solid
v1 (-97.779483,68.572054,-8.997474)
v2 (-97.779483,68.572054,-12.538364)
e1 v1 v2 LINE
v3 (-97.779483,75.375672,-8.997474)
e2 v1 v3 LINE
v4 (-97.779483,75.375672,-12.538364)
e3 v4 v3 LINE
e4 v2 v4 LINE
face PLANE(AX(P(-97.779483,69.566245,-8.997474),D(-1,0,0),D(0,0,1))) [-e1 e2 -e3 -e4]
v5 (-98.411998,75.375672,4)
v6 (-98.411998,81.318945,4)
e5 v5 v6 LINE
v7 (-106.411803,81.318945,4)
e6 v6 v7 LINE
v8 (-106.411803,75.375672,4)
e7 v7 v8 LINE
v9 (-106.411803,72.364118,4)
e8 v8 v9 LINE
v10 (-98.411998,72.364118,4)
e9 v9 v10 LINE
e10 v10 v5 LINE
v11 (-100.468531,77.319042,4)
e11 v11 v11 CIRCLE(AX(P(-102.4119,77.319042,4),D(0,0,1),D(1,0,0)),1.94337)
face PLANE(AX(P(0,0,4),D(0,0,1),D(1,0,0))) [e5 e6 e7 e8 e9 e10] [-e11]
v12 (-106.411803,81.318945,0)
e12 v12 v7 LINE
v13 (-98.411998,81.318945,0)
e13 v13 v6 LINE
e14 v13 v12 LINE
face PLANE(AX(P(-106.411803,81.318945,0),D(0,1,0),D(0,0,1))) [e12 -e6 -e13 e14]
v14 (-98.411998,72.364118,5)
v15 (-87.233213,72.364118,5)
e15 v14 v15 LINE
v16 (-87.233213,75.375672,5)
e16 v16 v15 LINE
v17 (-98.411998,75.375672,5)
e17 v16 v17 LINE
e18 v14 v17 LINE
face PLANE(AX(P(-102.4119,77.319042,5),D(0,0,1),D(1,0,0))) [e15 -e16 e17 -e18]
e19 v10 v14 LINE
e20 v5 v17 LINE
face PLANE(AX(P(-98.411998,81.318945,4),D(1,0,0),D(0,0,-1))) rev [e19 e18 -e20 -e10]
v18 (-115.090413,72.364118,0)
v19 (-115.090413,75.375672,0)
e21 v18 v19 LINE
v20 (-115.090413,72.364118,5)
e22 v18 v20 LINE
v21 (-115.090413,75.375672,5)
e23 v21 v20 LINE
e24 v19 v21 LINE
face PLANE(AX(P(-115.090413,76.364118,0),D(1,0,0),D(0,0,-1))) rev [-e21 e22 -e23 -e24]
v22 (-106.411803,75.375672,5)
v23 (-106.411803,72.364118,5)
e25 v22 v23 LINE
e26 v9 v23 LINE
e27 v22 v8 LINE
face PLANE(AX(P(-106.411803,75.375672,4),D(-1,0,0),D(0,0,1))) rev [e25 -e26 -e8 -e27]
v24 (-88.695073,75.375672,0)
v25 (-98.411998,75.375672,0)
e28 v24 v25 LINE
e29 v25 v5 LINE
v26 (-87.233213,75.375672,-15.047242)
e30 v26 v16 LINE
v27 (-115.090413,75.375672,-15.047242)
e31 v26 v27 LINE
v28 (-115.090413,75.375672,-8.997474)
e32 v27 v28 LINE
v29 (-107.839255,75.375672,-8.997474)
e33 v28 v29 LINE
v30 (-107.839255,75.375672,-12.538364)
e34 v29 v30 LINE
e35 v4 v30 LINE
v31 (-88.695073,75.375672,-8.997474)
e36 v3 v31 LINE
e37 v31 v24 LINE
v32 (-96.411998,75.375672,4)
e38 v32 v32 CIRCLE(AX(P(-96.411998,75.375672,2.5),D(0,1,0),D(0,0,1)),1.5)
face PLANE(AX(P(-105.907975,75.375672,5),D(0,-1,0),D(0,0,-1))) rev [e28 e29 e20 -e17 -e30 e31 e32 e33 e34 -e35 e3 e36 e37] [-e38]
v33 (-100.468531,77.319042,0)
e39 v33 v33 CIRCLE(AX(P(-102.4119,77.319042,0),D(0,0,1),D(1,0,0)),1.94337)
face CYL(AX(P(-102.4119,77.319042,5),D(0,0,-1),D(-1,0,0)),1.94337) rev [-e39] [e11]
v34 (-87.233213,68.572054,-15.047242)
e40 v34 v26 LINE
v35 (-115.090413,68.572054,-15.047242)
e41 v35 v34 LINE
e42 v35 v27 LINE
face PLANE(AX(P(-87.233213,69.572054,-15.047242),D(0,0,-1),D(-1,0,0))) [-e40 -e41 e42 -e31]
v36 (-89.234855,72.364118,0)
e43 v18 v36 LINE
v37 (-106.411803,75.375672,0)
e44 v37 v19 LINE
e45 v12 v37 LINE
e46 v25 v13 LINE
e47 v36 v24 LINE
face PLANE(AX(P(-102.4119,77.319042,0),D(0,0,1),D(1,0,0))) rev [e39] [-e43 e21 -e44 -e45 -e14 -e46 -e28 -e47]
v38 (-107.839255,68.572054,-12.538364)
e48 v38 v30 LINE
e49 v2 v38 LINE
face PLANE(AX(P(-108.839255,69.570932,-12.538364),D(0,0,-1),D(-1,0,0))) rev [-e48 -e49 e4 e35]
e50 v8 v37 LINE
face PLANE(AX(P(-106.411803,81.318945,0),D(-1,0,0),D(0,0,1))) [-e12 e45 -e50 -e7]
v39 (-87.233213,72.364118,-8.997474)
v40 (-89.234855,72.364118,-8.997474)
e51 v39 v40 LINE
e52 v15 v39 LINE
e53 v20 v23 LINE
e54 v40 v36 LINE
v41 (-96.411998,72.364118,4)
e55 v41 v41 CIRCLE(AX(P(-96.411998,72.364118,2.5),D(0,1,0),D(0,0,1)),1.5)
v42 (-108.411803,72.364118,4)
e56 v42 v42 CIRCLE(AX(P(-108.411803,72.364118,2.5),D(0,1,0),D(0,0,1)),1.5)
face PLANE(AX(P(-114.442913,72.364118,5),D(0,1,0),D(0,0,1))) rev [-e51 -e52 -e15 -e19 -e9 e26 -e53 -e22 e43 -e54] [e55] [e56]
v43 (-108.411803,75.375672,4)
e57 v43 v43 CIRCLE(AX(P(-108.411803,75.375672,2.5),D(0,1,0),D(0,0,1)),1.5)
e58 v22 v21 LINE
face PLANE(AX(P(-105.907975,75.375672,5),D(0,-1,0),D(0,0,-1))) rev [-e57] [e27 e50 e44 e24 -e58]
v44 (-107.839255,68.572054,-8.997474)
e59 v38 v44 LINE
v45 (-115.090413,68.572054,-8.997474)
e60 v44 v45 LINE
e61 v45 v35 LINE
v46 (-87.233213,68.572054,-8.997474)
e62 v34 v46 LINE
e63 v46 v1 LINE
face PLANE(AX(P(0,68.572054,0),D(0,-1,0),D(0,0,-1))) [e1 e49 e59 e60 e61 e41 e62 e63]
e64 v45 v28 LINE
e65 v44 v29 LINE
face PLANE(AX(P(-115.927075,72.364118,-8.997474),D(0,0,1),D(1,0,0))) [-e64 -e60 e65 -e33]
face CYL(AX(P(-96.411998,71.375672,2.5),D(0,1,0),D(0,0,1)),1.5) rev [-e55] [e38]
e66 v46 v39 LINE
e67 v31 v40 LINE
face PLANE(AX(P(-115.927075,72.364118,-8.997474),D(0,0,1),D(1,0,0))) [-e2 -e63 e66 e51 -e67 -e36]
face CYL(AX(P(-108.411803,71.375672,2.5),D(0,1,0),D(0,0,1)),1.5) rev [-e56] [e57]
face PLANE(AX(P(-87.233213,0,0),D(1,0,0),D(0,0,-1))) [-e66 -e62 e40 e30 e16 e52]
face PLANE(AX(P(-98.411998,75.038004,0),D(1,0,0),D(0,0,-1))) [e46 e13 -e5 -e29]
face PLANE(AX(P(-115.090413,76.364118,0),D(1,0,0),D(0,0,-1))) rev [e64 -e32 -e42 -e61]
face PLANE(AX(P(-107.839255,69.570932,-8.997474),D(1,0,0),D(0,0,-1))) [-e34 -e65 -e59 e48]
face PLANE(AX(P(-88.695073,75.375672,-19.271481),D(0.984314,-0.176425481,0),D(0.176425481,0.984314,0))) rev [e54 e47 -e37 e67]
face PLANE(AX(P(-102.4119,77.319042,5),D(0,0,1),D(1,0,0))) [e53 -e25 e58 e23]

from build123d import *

# Parameters (mm, degrees)
SKETCH1_R                 = 1.943369714
BOSS_EXTRUDE1_DEPTH       = 5
SKETCH2_W                 = 5
SKETCH2_H                 = 3.011554738
BOSS_EXTRUDE2_DEPTH       = 3
SKETCH3_W                 = 5
SKETCH3_H                 = 3.011554738
BOSS_EXTRUDE3_DEPTH       = 1
BOSS_EXTRUDE4_DEPTH       = 15.45
BOSS_EXTRUDE5_DEPTH       = 5
BOSS_EXTRUDE6_REACH       = 91.127
SKETCH6_W                 = 4.39741832
SKETCH6_H                 = 3.011554738
SKETCH7_W                 = 27.232002546
SKETCH7_H                 = 1.691876565
BOSS_EXTRUDE7_DEPTH       = 3.011555
CUT_EXTRUDE1_DEPTH        = 1.691877
SKETCH10_R                = 1.5
CUT_EXTRUDE2_DEPTH        = 5
CUT_EXTRUDE3_DEPTH        = 5
SKETCH12_W                = 7.087819815
SKETCH12_H                = 5.363231601
SKETCH12_W_2              = 7.084410937
BOSS_EXTRUDE8_DEPTH       = 3.011555
SKETCH13_R                = 1.5
CUT_EXTRUDE4_DEPTH        = 5
BOSS_EXTRUDE9_START       = -5.000001
BOSS_EXTRUDE9_DEPTH       = 5.000002
SKETCH15_R                = 1.5
BOSS_EXTRUDE10_DEPTH      = 3.011554738
CUT_EXTRUDE6_DEPTH        = 3.011555
BOSS_EXTRUDE11_START      = 1
BOSS_EXTRUDE11_DEPTH      = 1
CUT_EXTRUDE7_DEPTH        = 4
SKETCH21_R                = 1.5
CUT_EXTRUDE8_DEPTH        = 4
CUT_EXTRUDE9_DEPTH        = 1
BOSS_EXTRUDE12_START      = -13.37096588
BOSS_EXTRUDE12_DEPTH      = 4.373492366
BOSS_EXTRUDE13_DEPTH      = 1.68162
SKETCH30_W                = 13.059771794
SKETCH30_H                = 2.186746183
CUT_EXTRUDE10_DEPTH       = 10
SKETCH31_W                = 13.059771794
SKETCH31_H                = 2.186746183
BOSS_EXTRUDE14_DEPTH      = 2.793186
SKETCH32_W                = 27.857200393
SKETCH32_H                = 1.676275872
BOSS_EXTRUDE15_DEPTH      = 5.803619
SKETCH33_W                = 13.059771794
SKETCH33_H                = 1.354144498
CUT_EXTRUDE11_DEPTH       = 5.804742
BOSS_EXTRUDE16_DEPTH      = 0.832602
SKETCH35_W                = 2
SKETCH35_H                = 3.540890681
BOSS_EXTRUDE17_DEPTH      = 5.809427
SKETCH36_W                = 1
SKETCH36_H                = 3.540890681
BOSS_EXTRUDE18_DEPTH      = 5.80474
BOSS_EXTRUDE20_DEPTH      = 2
BOSS_EXTRUDE20_DEPTH_BACK = 2
CUT_EXTRUDE12_DEPTH       = 1


# Read off the part's stored shape, not the designer's step: Boss-Extrude12
with BuildPart() as part:
    # Sketch1 → Boss-Extrude1 (new body)
    with BuildSketch(Plane.XY):
        with BuildLine():
            Line((-105.90797469, 75.375672325), (-114.442913217, 75.375672325))
            Line((-114.442913217, 75.375672325), (-114.442913217, 72.364117587))
            Line((-114.442913217, 72.364117587), (-88.233212536, 72.364117587))
            Line((-88.233212536, 72.364117587), (-88.233212536, 75.375672325))
            Line((-88.233212536, 75.375672325), (-98.915825857, 75.375672325))
            ThreePointArc((-98.915825857, 75.375672325), (-102.411900273, 81.318944809), (-105.90797469, 75.375672325))
        make_face()
        with Locations((-102.411900273, 77.319042039)):
            Circle(SKETCH1_R, mode=Mode.SUBTRACT)
    extrude(amount=BOSS_EXTRUDE1_DEPTH)

    # Sketch2 → Boss-Extrude2 (add)
    with BuildSketch(Plane.ZY.offset(114.442913217)):
        with Locations((2.5, 73.869894956)):
            Rectangle(SKETCH2_W, SKETCH2_H)
    extrude(amount=BOSS_EXTRUDE2_DEPTH)

    # Sketch3 → Boss-Extrude3 (add)
    with BuildSketch(Plane(origin=(-88.233212536, 0, 0), x_dir=(0, 0, -1), z_dir=(1, 0, 0))):
        with Locations((-2.5, 73.869894956)):
            Rectangle(SKETCH3_W, SKETCH3_H)
    extrude(amount=BOSS_EXTRUDE3_DEPTH)

    # Sketch4 → Boss-Extrude4 (add)
    with BuildSketch(Plane(origin=(0, 0, 0), x_dir=(-1, 0, 0), z_dir=(0, 0, -1))):
        Polygon((89.234854516, 72.364117587), (87.233212536, 72.364117587), (87.233212536, 75.375672325), (88.695072503, 75.375672325), align=None)
        Polygon((117.442913217, 75.375672325), (117.442913217, 72.364117587), (115.090412929, 72.364117587), (115.927075049, 75.375672325), align=None)
    extrude(amount=BOSS_EXTRUDE4_DEPTH)

    # Sketch5 → Boss-Extrude5 (add)
    with BuildSketch(Plane(origin=(0, 0, -15.45), x_dir=(-1, 0, 0), z_dir=(0, 0, -1))):
        Polygon((89.234854516, 72.364117587), (88.695072503, 75.375672325), (87.233212536, 75.375672325), (87.233212536, 72.364117587), align=None)
        Polygon((117.442913217, 72.364117587), (117.442913217, 75.375672325), (115.927075049, 75.375672325), (115.090412929, 72.364117587), align=None)
    extrude(amount=BOSS_EXTRUDE5_DEPTH)

    # Boss-Extrude6: up to this plane
    boss_extrude6_end = Plane(origin=(-115.927075049, 75.375672325, -19.271481329), z_dir=(-0.9635080795452587, -0.2676792495712127, 0))
    # Sketch6 → Boss-Extrude6 (add, up to the surface)
    with BuildSketch(Plane(origin=(-87.233212536, 0, 0), x_dir=(0, 0, -1), z_dir=(1, 0, 0)), mode=Mode.PRIVATE) as boss_extrude6_sk1:
        with Locations((18.25129084, 73.869894956)):
            Rectangle(SKETCH6_W, SKETCH6_H)
    boss_extrude6_tool1 = split(extrude(boss_extrude6_sk1.sketch, amount=-BOSS_EXTRUDE6_REACH, mode=Mode.PRIVATE), bisect_by=boss_extrude6_end, keep=Keep.BOTH, mode=Mode.PRIVATE)
    add(boss_extrude6_tool1.solids().sort_by_distance((-87.233213, 73.869895, -18.251291))[0])

    # Sketch7 → Boss-Extrude7 (add)
    with BuildSketch(Plane(origin=(0, 75.375672325, 0), x_dir=(1, 0, 0), z_dir=(0, 1, 0))):
        with Locations((-102.311073776, 9.843411796)):
            Rectangle(SKETCH7_W, SKETCH7_H)
    extrude(amount=-BOSS_EXTRUDE7_DEPTH)

    # Sketch9 → Cut-Extrude1 (cut)
    with BuildSketch(Plane(origin=(0, 0, -10.689350079), x_dir=(-1, 0, 0), z_dir=(0, 0, -1))):
        with BuildLine():
            Line((100.39939301, 75.375672325), (104.391873417, 75.375672325))
            ThreePointArc((104.391873417, 75.375672325), (102.395633214, 75.079709627), (100.39939301, 75.375672325))
        make_face()
    extrude(amount=-CUT_EXTRUDE1_DEPTH, mode=Mode.SUBTRACT)

    # Sketch10 → Cut-Extrude2 (cut)
    with BuildSketch(Plane(origin=(0, 75.375672325, 0), x_dir=(1, 0, 0), z_dir=(0, 1, 0))):
        with Locations(Location((-102.389399958, 18.296933794, 0), (0, 0, 270))):
            Circle(SKETCH10_R)
        with Locations(Location((-114.196864357, -2.469689872, 0), (0, 0, 270))):
            Circle(SKETCH10_R)
        with Locations(Location((-90.467618586, -2.570513513, 0), (0, 0, 270))):
            Circle(SKETCH10_R)
    extrude(amount=-CUT_EXTRUDE2_DEPTH, mode=Mode.SUBTRACT)

    # Sketch11 → Cut-Extrude3 (cut)
    with BuildSketch(Plane(origin=(0, 75.375672325, 0), x_dir=(1, 0, 0), z_dir=(0, 1, 0))):
        Polygon((-87.233212536, 20.45), (-115.927075049, 20.45), (-117.442913217, 20.45), (-117.442913217, 16.05258168), (-115.927075049, 16.05258168), (-87.233212536, 16.05258168), align=None)
    extrude(amount=-CUT_EXTRUDE3_DEPTH, mode=Mode.SUBTRACT)

    # Sketch12 → Boss-Extrude8 (add)
    with BuildSketch(Plane(origin=(0, 75.375672325, 0), x_dir=(1, 0, 0), z_dir=(0, 1, 0))):
        with Locations((-112.383165142, 13.370965879)):
            Rectangle(SKETCH12_W, SKETCH12_H)
        with Locations((-92.237277972, 13.370965879)):
            Rectangle(SKETCH12_W_2, SKETCH12_H)
    extrude(amount=-BOSS_EXTRUDE8_DEPTH)

    # Sketch13 → Cut-Extrude4 (cut)
    with BuildSketch(Plane(origin=(0, 75.375672325, 0), x_dir=(1, 0, 0), z_dir=(0, 1, 0))):
        with Locations(Location((-91.387861774, 12.69615807, 0), (0, 0, 270))):
            Circle(SKETCH13_R)
        with Locations(Location((-112.880960362, 12.852813307, 0), (0, 0, 270))):
            Circle(SKETCH13_R)
    extrude(amount=-CUT_EXTRUDE4_DEPTH, mode=Mode.SUBTRACT)

    # Sketch14 → Boss-Extrude9 (add)
    with BuildSketch(Plane.XY.offset(5).offset(BOSS_EXTRUDE9_START)):
        with BuildLine():
            Line((-102.411900273, 81.318944809), (-106.411803043, 81.318944809))
            Line((-106.411803043, 81.318944809), (-106.411803043, 77.319042039))
            ThreePointArc((-106.411803043, 77.319042039), (-105.240258646, 80.147400412), (-102.411900273, 81.318944809))
        make_face()
        with BuildLine():
            ThreePointArc((-105.90797469, 75.375672325), (-106.283797735, 76.315233186), (-106.411803043, 77.319042039))
            Line((-106.411803043, 77.319042039), (-106.411803043, 75.375672325))
            Line((-106.411803043, 75.375672325), (-105.90797469, 75.375672325))
        make_face()
        with BuildLine():
            Line((-98.411997503, 81.318944809), (-102.411900273, 81.318944809))
            ThreePointArc((-102.411900273, 81.318944809), (-99.583541901, 80.147400412), (-98.411997503, 77.319042039))
            Line((-98.411997503, 77.319042039), (-98.411997503, 81.318944809))
        make_face()
        with BuildLine():
            Line((-98.411997503, 75.375672325), (-98.411997503, 77.319042039))
            ThreePointArc((-98.411997503, 77.319042039), (-98.540002811, 76.315233186), (-98.915825857, 75.375672325))
            Line((-98.915825857, 75.375672325), (-98.411997503, 75.375672325))
        make_face()
    extrude(amount=BOSS_EXTRUDE9_DEPTH)

    # Sketch15 → Boss-Extrude10 (add)
    with BuildSketch(Plane(origin=(0, 75.375672325, 0), x_dir=(1, 0, 0), z_dir=(0, 1, 0))):
        with Locations((-114.196864357, -2.469689872)):
            Circle(SKETCH15_R)
        with Locations((-90.467618586, -2.570513513)):
            Circle(SKETCH15_R)
        with Locations((-91.387861774, 12.69615807)):
            Circle(SKETCH15_R)
        with Locations((-112.880960362, 12.852813307)):
            Circle(SKETCH15_R)
    extrude(amount=-BOSS_EXTRUDE10_DEPTH)

    # Sketch17 → Cut-Extrude6 (cut)
    with BuildSketch(Plane(origin=(0, 75.375672325, 0), x_dir=(1, 0, 0), z_dir=(0, 1, 0))):
        Polygon((-108.839255234, 13.37096588), (-117.442913217, 13.37096588), (-117.442913217, 16.05258168), (-87.233212536, 16.05258168), (-87.233212536, 13.37096588), (-95.77948344, 13.37096588), align=None)
    extrude(amount=-CUT_EXTRUDE6_DEPTH, mode=Mode.SUBTRACT)

    # Sketch19 → Boss-Extrude11 (add)
    with BuildSketch(Plane(origin=(0, 0, -10.689350079), x_dir=(-1, 0, 0), z_dir=(0, 0, -1)).offset(BOSS_EXTRUDE11_START)):
        with BuildLine():
            Line((95.77948344, 75.375672325), (95.77948344, 72.364117587))
            Line((95.77948344, 72.364117587), (108.839255234, 72.364117587))
            Line((108.839255234, 72.364117587), (108.839255234, 75.375672325))
            Line((108.839255234, 75.375672325), (104.391873417, 75.375672325))
            ThreePointArc((104.391873417, 75.375672325), (102.395633214, 75.079709627), (100.39939301, 75.375672325))
            Line((100.39939301, 75.375672325), (95.77948344, 75.375672325))
        make_face()
    extrude(amount=-BOSS_EXTRUDE11_DEPTH)

    # Sketch20 → Cut-Extrude7 (cut)
    with BuildSketch(Plane.XZ.offset(-72.364117587)):
        Polygon((-117.442913217, -13.37096588), (-115.090412929, -13.37096588), (-115.090412929, 0), (-115.090412929, 5), (-117.442913217, 5), (-117.442913217, 0), align=None)
    extrude(amount=-CUT_EXTRUDE7_DEPTH, mode=Mode.SUBTRACT)

    # Sketch21 → Cut-Extrude8 (cut)
    with BuildSketch(Plane(origin=(0, 75.375672325, 0), x_dir=(1, 0, 0), z_dir=(0, 1, 0))):
        with Locations(Location((-96.411997503, -2.5, 0), (0, 0, 270))):
            Circle(SKETCH21_R)
        with Locations(Location((-108.411803043, -2.5, 0), (0, 0, 270))):
            Circle(SKETCH21_R)
    extrude(amount=-CUT_EXTRUDE8_DEPTH, mode=Mode.SUBTRACT)

    # Sketch22 → Cut-Extrude9 (cut)
    with BuildSketch(Plane.XY.offset(5)):
        Polygon((-106.411803043, 75.375672325), (-106.411803043, 72.364117587), (-98.411997503, 72.364117587), (-98.411997503, 75.375672325), (-98.411997503, 81.318944809), (-106.411803043, 81.318944809), align=None)
    extrude(amount=-CUT_EXTRUDE9_DEPTH, mode=Mode.SUBTRACT)


with BuildPart() as cut_extrude9_kept_piece:
    # of the separate pieces the step leaves, the one the design keeps (cut_extrude9_pieces_kept)
    add(part.part.solids().sort_by_distance((-106.411803043, 75.375672325, 0))[0])

    # Boss-Extrude12 outline → Boss-Extrude12 (add)
    with BuildSketch(Plane.XY.offset(BOSS_EXTRUDE12_START)):
        Polygon((-95.77948344, 69.566245358), (-87.233212536, 69.56317843), (-87.233212536, 72.364117587), (-95.77948344, 72.364117587), align=None)
        Polygon((-108.839255234, 69.570932009), (-108.839255234, 72.364117587), (-115.090412929, 72.364117587), (-115.090412929, 69.57317531), align=None)
    extrude(amount=BOSS_EXTRUDE12_DEPTH)

    # Sketch26 → Boss-Extrude13 (add)
    with BuildSketch(Plane(origin=(0, 0, -11.689350079), x_dir=(-1, 0, 0), z_dir=(0, 0, -1))):
        with BuildLine():
            Line((100.39939301, 75.375672325), (95.77948344, 75.375672325))
            Line((95.77948344, 75.375672325), (95.77948344, 72.364117587))
            Line((95.77948344, 72.364117587), (108.839255234, 72.364117587))
            Line((108.839255234, 72.364117587), (108.839255234, 75.375672325))
            Line((108.839255234, 75.375672325), (104.391873417, 75.375672325))
            ThreePointArc((104.391873417, 75.375672325), (102.395633214, 75.079709627), (100.39939301, 75.375672325))
        make_face()
    extrude(amount=BOSS_EXTRUDE13_DEPTH)

    # Sketch30 → Cut-Extrude10 (cut)
    with BuildSketch(Plane(origin=(0, 75.375672325, 0), x_dir=(1, 0, 0), z_dir=(0, 1, 0))):
        with Locations((-102.309369337, 10.090846606)):
            Rectangle(SKETCH30_W, SKETCH30_H)
    extrude(amount=-CUT_EXTRUDE10_DEPTH, mode=Mode.SUBTRACT)

    # Sketch31 → Boss-Extrude14 (add)
    with BuildSketch(Plane.XZ.offset(-72.364117587)):
        with Locations((-102.309369337, -12.277592789)):
            Rectangle(SKETCH31_W, SKETCH31_H)
    extrude(amount=BOSS_EXTRUDE14_DEPTH)

    # Sketch32 → Boss-Extrude15 (add)
    with BuildSketch(Plane(origin=(0, 75.375672325, 0), x_dir=(1, 0, 0), z_dir=(0, 1, 0))):
        with Locations((-101.161812733, 14.209103816)):
            Rectangle(SKETCH32_W, SKETCH32_H)
    extrude(amount=-BOSS_EXTRUDE15_DEPTH)

    # Sketch33 → Cut-Extrude11 (cut)
    with BuildSketch(Plane(origin=(0, 75.375672325, 0), x_dir=(1, 0, 0), z_dir=(0, 1, 0))):
        with Locations((-102.309369337, 11.861291946)):
            Rectangle(SKETCH33_W, SKETCH33_H)
    extrude(amount=-CUT_EXTRUDE11_DEPTH, mode=Mode.SUBTRACT)

    # Sketch34 → Boss-Extrude16 (add)
    with BuildSketch(Plane.XY.offset(-13.37096588)):
        with BuildLine():
            Line((-100.39939301, 75.375672325), (-104.391873417, 75.375672325))
            ThreePointArc((-104.391873417, 75.375672325), (-102.395633214, 75.079709627), (-100.39939301, 75.375672325))
        make_face()
    extrude(amount=BOSS_EXTRUDE16_DEPTH)

    # Sketch35 → Boss-Extrude17 (add)
    with BuildSketch(Plane(origin=(0, 75.375672325, 0), x_dir=(1, 0, 0), z_dir=(0, 1, 0))):
        with Locations((-96.77948344, 10.767918855)):
            Rectangle(SKETCH35_W, SKETCH35_H)
    extrude(amount=-BOSS_EXTRUDE17_DEPTH)

    # Sketch36 → Boss-Extrude18 (add)
    with BuildSketch(Plane(origin=(0, 75.375672325, 0), x_dir=(1, 0, 0), z_dir=(0, 1, 0))):
        with Locations((-108.339255234, 10.767918855)):
            Rectangle(SKETCH36_W, SKETCH36_H)
    extrude(amount=-BOSS_EXTRUDE18_DEPTH)

    # Sketch37 → Boss-Extrude20 (add, two sides: drawn at the far end of the back side and taken through both)
    with BuildSketch(Plane.XZ.offset(-69.57205366).offset(-BOSS_EXTRUDE20_DEPTH_BACK)):
        Polygon((-115.090412929, -15.047241752), (-115.090412929, -8.997473514), (-107.839255234, -8.997473514), (-107.839255234, -12.538364195), (-97.77948344, -12.538364195), (-97.77948344, -8.997473514), (-87.233212536, -8.997473514), (-87.233212536, -15.047241752), align=None)
    extrude(amount=BOSS_EXTRUDE20_DEPTH + BOSS_EXTRUDE20_DEPTH_BACK)

    # Sketch39 → Cut-Extrude12 (cut)
    with BuildSketch(Plane.XZ.offset(-67.57205366)):
        Polygon((-115.090412929, -15.047241752), (-87.233212536, -15.047241752), (-87.233212536, -8.997473514), (-97.77948344, -8.997473514), (-97.77948344, -12.538364195), (-107.839255234, -12.538364195), (-107.839255234, -8.997473514), (-115.090412929, -8.997473514), align=None)
    extrude(amount=-CUT_EXTRUDE12_DEPTH, mode=Mode.SUBTRACT)


solid = cut_extrude9_kept_piece.part
